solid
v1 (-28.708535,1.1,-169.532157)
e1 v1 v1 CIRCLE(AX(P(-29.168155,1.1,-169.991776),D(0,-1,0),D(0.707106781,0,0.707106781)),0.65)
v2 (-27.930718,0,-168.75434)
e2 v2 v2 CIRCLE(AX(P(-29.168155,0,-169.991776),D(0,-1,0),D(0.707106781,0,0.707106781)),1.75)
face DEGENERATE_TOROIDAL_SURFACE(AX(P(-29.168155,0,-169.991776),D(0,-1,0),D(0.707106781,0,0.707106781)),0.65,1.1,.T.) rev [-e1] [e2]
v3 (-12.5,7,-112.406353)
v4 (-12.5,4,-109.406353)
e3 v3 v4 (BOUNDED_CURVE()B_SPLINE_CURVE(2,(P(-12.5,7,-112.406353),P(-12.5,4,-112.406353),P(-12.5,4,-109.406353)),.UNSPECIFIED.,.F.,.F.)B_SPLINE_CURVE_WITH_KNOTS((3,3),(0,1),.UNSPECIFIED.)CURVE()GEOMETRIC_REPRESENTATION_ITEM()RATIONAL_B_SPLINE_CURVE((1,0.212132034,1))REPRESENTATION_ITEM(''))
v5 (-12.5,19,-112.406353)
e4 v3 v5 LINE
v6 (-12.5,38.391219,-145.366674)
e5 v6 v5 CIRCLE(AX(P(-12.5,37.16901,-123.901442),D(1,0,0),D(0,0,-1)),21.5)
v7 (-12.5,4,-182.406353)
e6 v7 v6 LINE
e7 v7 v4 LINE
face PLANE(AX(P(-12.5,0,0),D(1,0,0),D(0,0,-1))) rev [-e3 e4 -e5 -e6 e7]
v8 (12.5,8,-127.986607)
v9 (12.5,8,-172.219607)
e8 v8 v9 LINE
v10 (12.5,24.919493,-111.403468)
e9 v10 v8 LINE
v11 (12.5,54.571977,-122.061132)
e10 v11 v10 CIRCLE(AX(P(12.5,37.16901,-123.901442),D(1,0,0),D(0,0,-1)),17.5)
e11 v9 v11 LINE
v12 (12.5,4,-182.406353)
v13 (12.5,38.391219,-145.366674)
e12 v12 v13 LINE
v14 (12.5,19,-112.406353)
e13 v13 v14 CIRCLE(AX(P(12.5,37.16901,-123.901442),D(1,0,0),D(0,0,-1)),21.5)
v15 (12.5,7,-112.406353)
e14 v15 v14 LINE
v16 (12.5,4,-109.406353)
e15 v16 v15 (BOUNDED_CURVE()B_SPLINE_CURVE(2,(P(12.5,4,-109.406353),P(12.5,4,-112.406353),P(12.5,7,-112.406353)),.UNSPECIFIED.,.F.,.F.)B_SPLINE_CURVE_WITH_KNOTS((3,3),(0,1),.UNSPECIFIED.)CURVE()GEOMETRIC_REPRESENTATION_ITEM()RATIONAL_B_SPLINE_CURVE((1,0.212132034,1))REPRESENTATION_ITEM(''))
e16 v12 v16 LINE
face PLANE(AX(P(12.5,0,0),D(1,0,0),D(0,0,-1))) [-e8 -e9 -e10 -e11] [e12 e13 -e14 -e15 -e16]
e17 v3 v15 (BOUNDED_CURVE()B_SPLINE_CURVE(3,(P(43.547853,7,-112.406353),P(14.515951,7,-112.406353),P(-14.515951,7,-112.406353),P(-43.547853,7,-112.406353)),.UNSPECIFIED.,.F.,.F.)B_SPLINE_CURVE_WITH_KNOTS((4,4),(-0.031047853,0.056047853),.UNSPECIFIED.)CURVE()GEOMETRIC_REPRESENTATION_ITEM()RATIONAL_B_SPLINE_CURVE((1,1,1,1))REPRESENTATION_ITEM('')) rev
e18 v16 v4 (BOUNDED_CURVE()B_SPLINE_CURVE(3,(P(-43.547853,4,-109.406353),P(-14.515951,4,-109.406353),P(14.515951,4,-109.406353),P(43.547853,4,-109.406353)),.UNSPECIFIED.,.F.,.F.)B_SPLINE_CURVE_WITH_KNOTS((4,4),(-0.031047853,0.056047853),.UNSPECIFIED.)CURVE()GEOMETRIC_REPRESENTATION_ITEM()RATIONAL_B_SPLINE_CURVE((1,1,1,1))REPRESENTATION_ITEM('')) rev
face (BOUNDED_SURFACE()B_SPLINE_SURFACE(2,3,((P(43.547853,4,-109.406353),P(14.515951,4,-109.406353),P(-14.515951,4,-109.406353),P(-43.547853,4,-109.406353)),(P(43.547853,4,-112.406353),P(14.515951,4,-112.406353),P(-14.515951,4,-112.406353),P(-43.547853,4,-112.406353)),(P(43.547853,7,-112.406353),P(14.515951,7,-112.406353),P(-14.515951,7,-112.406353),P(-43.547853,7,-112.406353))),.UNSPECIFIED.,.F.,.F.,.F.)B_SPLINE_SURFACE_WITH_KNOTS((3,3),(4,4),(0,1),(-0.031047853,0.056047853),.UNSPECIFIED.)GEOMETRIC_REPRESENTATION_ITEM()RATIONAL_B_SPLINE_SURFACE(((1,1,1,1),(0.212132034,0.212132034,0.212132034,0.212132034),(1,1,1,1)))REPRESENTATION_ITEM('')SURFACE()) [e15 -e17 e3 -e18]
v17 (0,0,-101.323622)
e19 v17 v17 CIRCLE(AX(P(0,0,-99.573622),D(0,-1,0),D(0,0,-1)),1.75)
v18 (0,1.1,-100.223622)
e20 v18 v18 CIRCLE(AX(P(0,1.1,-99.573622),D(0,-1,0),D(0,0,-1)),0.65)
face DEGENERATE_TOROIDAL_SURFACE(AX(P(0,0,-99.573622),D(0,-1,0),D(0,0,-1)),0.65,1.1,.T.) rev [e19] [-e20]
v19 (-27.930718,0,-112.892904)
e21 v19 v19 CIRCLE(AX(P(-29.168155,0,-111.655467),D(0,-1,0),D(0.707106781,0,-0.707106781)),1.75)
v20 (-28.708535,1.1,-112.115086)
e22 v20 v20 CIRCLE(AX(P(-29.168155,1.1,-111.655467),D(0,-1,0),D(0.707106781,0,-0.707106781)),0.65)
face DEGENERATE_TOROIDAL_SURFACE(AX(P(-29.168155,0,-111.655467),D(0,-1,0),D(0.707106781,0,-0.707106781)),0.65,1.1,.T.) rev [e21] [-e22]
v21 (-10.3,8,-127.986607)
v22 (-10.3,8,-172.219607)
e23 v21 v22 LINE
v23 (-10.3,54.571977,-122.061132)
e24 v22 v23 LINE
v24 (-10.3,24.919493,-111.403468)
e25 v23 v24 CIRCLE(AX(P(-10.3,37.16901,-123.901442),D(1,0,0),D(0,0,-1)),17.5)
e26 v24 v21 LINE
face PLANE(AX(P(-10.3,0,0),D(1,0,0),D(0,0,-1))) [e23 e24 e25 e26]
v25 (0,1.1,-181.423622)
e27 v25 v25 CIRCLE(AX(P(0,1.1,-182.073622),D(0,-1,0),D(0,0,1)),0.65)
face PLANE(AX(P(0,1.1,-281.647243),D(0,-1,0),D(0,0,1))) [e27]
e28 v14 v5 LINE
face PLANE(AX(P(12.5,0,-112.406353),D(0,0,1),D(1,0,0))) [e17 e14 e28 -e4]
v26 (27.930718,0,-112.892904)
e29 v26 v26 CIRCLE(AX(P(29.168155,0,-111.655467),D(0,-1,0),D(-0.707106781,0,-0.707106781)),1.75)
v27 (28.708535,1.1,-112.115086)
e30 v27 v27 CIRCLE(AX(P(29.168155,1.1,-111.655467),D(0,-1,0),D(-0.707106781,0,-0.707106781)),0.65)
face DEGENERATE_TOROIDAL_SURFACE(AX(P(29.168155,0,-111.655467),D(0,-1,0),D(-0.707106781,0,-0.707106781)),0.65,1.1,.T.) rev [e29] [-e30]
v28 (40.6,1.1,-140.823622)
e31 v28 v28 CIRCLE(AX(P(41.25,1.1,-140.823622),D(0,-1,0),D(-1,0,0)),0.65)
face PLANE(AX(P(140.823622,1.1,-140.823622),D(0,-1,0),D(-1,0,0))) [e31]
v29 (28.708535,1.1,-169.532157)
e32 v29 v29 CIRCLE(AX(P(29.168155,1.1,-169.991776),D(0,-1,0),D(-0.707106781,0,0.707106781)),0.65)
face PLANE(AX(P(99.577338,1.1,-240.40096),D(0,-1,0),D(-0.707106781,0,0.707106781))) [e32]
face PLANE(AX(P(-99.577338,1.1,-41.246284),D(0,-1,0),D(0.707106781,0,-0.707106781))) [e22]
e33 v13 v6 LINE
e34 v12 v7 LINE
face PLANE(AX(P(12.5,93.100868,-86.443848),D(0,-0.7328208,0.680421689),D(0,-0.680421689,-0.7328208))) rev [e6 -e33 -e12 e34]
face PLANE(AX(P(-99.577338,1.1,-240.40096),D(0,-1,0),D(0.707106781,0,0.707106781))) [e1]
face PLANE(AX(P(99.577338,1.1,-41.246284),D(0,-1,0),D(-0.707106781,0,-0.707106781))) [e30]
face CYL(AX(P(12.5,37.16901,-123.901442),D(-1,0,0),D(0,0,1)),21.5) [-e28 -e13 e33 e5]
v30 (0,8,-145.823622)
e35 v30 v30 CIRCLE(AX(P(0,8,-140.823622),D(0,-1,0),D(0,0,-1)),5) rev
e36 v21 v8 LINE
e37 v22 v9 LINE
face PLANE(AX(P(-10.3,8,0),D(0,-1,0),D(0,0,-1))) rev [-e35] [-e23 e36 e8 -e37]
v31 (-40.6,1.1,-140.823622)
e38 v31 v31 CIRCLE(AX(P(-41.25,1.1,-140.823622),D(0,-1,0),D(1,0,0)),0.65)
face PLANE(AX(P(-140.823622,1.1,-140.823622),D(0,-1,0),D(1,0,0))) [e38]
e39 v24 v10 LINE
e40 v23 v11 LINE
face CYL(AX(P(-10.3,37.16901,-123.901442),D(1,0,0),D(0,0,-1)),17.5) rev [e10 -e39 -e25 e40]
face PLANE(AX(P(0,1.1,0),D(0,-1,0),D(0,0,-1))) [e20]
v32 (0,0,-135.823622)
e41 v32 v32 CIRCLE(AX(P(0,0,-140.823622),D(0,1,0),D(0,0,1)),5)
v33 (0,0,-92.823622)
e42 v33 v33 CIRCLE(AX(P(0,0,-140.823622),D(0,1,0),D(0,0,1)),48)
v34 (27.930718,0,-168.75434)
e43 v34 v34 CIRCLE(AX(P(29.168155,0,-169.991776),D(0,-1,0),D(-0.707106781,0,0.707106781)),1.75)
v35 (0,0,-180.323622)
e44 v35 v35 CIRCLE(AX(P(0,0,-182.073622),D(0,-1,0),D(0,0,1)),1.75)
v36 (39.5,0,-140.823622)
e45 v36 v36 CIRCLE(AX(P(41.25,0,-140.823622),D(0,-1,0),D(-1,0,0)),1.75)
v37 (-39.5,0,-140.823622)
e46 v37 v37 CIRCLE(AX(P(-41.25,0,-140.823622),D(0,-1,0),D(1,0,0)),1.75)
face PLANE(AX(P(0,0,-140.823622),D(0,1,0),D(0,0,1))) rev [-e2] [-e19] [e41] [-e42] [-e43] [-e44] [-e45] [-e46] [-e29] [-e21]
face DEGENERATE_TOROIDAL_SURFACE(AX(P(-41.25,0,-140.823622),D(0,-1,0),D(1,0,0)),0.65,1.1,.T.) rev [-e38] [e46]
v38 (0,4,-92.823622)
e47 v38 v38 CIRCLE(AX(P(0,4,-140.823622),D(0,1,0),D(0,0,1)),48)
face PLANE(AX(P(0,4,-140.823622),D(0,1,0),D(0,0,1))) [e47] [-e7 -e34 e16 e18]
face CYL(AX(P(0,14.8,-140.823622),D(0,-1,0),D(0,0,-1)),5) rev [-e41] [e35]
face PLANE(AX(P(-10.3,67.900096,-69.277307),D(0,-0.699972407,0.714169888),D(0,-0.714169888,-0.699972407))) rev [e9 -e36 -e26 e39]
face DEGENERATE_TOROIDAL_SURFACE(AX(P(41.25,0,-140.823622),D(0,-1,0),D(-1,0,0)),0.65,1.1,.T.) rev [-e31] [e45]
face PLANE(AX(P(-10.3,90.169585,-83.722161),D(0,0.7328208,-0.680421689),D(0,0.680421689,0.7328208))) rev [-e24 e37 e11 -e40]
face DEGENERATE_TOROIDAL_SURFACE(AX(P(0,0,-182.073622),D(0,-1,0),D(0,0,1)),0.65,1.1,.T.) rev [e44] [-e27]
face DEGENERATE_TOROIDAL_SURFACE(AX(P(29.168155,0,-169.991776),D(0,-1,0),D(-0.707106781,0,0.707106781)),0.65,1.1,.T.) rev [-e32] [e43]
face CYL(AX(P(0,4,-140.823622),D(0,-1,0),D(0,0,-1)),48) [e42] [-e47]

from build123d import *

# Parameters (mm, degrees)
CROQUIS3_R              = 48
SALIENTE_EXTRUIR2_DEPTH = 4
CROQUIS5_R              = 1.75
CORTAR_EXTRUIR3_DEPTH   = 1.1
REDONDEO3_R             = 1.1
MATRIZC5_COUNT          = 8
REDONDEO3_OF_MATRIZC5_R = 1.1
SALIENTE_EXTRUIR3_DEPTH = 12.5
REDONDEO4_START         = -12.5
REDONDEO4_DEPTH         = 25
CORTAR_EXTRUIR4_DEPTH   = 22.8
CROQUIS8_R              = 5
CORTAR_EXTRUIR5_DEPTH   = 14.8


with BuildPart() as part:
    # Croquis3 → Saliente-Extruir2 (new body)
    with BuildSketch(Plane(origin=(0, 0, 0), x_dir=(1, 0, 0), z_dir=(0, 1, 0))):
        with Locations(Location((0, 140.82362169, 0), (0, 0, 270))):
            Circle(CROQUIS3_R)
    extrude(amount=SALIENTE_EXTRUIR2_DEPTH)

    # Croquis5 → Cortar-Extruir3 (cut)
    with BuildSketch(Plane.XZ):
        with Locations(Location((0, -99.57362169, 0), (0, 0, 270))):
            Circle(CROQUIS5_R)
    cortar_extruir3 = extrude(amount=-CORTAR_EXTRUIR3_DEPTH, mode=Mode.SUBTRACT)

    # Redondeo3
    redondeo3_edges = [part.edges().sort_by_distance(p)[0] for p in [
        (0, 1.1, -97.82362169),
    ]]
    fillet(redondeo3_edges, radius=REDONDEO3_R - 0.0001)  # a hair under: the kernel refuses the full size

    # MatrizC5: Cortar-Extruir3 ×8 about axis
    matrizc5_axis = Axis((0, 0, -140.82362169), (0, 1, 0))
    for i in range(1, MATRIZC5_COUNT):
        add(cortar_extruir3.rotate(matrizc5_axis, i * 360 / MATRIZC5_COUNT), mode=Mode.SUBTRACT)

    # Redondeo3 of MatrizC5
    redondeo3_of_matrizc5_edges = [part.edges().sort_by_distance(p)[0] for p in [
        (30.405591591, 1.1, -110.418030099),
        (43, 1.1, -140.82362169),
        (30.405591591, 1.1, -171.229213281),
        (0, 1.1, -183.82362169),
        (-30.405591591, 1.1, -171.229213281),
        (-43, 1.1, -140.82362169),
        (-30.405591591, 1.1, -110.418030099),
    ]]
    fillet(redondeo3_of_matrizc5_edges, radius=REDONDEO3_OF_MATRIZC5_R - 0.0001)  # a hair under: the kernel refuses the full size

    # Croquis6 → Saliente-Extruir3 (add, symmetric)
    with BuildSketch(Plane(origin=(0, 0, 0), x_dir=(0, 0, -1), z_dir=(1, 0, 0))):
        with BuildLine():
            ThreePointArc((145.401441519, 37.169010455), (145.39274788, 37.78036216), (145.366673993, 38.391219459))
            Line((145.366673993, 38.391219459), (112.406353043, 19))
            ThreePointArc((112.406353043, 19), (134.272208071, 18.335603936), (145.401441519, 37.169010455))
        make_face()
        with BuildLine():
            Line((112.406353043, 19), (145.366673993, 38.391219459))
            ThreePointArc((145.366673993, 38.391219459), (112.999341224, 55.699909223), (112.406353043, 19))
        make_face()
        with BuildLine():
            Line((112.406353043, 4), (182.406353043, 4))
            Line((182.406353043, 4), (145.366673993, 38.391219459))
            ThreePointArc((145.366673993, 38.391219459), (145.39274788, 37.78036216), (145.401441519, 37.169010455))
            ThreePointArc((145.401441519, 37.169010455), (134.272208071, 18.335603936), (112.406353043, 19))
            Line((112.406353043, 19), (112.406353043, 4))
        make_face()
    extrude(amount=SALIENTE_EXTRUIR3_DEPTH, both=True)

    # Redondeo4: read off the stored shape, not the designer's step
    # Redondeo4 outline → Redondeo4 (add)
    with BuildSketch(Plane.YZ.offset(REDONDEO4_START)):
        with BuildLine():
            add(Edge.make_bspline(
                [(4, -109.406353043), (4, -112.406353043), (7, -112.406353043)],
                knots=[0, 0, 0, 1, 1, 1], degree=2, weights=[1, 0.212132034, 1]))
            Line((4, -109.406353043), (4, -112.406353043))
            Line((4, -112.406353043), (7, -112.406353043))
        make_face()
    extrude(amount=REDONDEO4_DEPTH)

    # Croquis7 → Cortar-Extruir4 (cut)
    with BuildSketch(Plane(origin=(12.5, 0, 0), x_dir=(0, 0, -1), z_dir=(1, 0, 0))):
        with BuildLine():
            Line((111.403468482, 24.919493324), (141.392905589, 36.622489926))
            Line((141.392905589, 36.622489926), (122.06113227, 54.571977497))
            ThreePointArc((122.06113227, 54.571977497), (107.432864193, 43.088128705), (111.403468482, 24.919493324))
        make_face()
        with BuildLine():
            ThreePointArc((111.403468482, 24.919493324), (130.263341435, 20.866365594), (141.392905589, 36.622489926))
            Line((141.392905589, 36.622489926), (111.403468482, 24.919493324))
        make_face()
        with BuildLine():
            Line((172.219606624, 8), (141.392905589, 36.622489926))
            ThreePointArc((141.392905589, 36.622489926), (130.263341435, 20.866365594), (111.403468482, 24.919493324))
            Line((111.403468482, 24.919493324), (127.986607419, 8))
            Line((127.986607419, 8), (172.219606624, 8))
        make_face()
    extrude(amount=-CORTAR_EXTRUIR4_DEPTH, mode=Mode.SUBTRACT)

    # Croquis8 → Cortar-Extruir5 (cut)
    with BuildSketch(Plane(origin=(0, 0, 0), x_dir=(1, 0, 0), z_dir=(0, 1, 0))):
        with Locations(Location((0, 140.82362169, 0), (0, 0, 90))):
            Circle(CROQUIS8_R)
    extrude(amount=CORTAR_EXTRUIR5_DEPTH, mode=Mode.SUBTRACT)


solid = part.part
